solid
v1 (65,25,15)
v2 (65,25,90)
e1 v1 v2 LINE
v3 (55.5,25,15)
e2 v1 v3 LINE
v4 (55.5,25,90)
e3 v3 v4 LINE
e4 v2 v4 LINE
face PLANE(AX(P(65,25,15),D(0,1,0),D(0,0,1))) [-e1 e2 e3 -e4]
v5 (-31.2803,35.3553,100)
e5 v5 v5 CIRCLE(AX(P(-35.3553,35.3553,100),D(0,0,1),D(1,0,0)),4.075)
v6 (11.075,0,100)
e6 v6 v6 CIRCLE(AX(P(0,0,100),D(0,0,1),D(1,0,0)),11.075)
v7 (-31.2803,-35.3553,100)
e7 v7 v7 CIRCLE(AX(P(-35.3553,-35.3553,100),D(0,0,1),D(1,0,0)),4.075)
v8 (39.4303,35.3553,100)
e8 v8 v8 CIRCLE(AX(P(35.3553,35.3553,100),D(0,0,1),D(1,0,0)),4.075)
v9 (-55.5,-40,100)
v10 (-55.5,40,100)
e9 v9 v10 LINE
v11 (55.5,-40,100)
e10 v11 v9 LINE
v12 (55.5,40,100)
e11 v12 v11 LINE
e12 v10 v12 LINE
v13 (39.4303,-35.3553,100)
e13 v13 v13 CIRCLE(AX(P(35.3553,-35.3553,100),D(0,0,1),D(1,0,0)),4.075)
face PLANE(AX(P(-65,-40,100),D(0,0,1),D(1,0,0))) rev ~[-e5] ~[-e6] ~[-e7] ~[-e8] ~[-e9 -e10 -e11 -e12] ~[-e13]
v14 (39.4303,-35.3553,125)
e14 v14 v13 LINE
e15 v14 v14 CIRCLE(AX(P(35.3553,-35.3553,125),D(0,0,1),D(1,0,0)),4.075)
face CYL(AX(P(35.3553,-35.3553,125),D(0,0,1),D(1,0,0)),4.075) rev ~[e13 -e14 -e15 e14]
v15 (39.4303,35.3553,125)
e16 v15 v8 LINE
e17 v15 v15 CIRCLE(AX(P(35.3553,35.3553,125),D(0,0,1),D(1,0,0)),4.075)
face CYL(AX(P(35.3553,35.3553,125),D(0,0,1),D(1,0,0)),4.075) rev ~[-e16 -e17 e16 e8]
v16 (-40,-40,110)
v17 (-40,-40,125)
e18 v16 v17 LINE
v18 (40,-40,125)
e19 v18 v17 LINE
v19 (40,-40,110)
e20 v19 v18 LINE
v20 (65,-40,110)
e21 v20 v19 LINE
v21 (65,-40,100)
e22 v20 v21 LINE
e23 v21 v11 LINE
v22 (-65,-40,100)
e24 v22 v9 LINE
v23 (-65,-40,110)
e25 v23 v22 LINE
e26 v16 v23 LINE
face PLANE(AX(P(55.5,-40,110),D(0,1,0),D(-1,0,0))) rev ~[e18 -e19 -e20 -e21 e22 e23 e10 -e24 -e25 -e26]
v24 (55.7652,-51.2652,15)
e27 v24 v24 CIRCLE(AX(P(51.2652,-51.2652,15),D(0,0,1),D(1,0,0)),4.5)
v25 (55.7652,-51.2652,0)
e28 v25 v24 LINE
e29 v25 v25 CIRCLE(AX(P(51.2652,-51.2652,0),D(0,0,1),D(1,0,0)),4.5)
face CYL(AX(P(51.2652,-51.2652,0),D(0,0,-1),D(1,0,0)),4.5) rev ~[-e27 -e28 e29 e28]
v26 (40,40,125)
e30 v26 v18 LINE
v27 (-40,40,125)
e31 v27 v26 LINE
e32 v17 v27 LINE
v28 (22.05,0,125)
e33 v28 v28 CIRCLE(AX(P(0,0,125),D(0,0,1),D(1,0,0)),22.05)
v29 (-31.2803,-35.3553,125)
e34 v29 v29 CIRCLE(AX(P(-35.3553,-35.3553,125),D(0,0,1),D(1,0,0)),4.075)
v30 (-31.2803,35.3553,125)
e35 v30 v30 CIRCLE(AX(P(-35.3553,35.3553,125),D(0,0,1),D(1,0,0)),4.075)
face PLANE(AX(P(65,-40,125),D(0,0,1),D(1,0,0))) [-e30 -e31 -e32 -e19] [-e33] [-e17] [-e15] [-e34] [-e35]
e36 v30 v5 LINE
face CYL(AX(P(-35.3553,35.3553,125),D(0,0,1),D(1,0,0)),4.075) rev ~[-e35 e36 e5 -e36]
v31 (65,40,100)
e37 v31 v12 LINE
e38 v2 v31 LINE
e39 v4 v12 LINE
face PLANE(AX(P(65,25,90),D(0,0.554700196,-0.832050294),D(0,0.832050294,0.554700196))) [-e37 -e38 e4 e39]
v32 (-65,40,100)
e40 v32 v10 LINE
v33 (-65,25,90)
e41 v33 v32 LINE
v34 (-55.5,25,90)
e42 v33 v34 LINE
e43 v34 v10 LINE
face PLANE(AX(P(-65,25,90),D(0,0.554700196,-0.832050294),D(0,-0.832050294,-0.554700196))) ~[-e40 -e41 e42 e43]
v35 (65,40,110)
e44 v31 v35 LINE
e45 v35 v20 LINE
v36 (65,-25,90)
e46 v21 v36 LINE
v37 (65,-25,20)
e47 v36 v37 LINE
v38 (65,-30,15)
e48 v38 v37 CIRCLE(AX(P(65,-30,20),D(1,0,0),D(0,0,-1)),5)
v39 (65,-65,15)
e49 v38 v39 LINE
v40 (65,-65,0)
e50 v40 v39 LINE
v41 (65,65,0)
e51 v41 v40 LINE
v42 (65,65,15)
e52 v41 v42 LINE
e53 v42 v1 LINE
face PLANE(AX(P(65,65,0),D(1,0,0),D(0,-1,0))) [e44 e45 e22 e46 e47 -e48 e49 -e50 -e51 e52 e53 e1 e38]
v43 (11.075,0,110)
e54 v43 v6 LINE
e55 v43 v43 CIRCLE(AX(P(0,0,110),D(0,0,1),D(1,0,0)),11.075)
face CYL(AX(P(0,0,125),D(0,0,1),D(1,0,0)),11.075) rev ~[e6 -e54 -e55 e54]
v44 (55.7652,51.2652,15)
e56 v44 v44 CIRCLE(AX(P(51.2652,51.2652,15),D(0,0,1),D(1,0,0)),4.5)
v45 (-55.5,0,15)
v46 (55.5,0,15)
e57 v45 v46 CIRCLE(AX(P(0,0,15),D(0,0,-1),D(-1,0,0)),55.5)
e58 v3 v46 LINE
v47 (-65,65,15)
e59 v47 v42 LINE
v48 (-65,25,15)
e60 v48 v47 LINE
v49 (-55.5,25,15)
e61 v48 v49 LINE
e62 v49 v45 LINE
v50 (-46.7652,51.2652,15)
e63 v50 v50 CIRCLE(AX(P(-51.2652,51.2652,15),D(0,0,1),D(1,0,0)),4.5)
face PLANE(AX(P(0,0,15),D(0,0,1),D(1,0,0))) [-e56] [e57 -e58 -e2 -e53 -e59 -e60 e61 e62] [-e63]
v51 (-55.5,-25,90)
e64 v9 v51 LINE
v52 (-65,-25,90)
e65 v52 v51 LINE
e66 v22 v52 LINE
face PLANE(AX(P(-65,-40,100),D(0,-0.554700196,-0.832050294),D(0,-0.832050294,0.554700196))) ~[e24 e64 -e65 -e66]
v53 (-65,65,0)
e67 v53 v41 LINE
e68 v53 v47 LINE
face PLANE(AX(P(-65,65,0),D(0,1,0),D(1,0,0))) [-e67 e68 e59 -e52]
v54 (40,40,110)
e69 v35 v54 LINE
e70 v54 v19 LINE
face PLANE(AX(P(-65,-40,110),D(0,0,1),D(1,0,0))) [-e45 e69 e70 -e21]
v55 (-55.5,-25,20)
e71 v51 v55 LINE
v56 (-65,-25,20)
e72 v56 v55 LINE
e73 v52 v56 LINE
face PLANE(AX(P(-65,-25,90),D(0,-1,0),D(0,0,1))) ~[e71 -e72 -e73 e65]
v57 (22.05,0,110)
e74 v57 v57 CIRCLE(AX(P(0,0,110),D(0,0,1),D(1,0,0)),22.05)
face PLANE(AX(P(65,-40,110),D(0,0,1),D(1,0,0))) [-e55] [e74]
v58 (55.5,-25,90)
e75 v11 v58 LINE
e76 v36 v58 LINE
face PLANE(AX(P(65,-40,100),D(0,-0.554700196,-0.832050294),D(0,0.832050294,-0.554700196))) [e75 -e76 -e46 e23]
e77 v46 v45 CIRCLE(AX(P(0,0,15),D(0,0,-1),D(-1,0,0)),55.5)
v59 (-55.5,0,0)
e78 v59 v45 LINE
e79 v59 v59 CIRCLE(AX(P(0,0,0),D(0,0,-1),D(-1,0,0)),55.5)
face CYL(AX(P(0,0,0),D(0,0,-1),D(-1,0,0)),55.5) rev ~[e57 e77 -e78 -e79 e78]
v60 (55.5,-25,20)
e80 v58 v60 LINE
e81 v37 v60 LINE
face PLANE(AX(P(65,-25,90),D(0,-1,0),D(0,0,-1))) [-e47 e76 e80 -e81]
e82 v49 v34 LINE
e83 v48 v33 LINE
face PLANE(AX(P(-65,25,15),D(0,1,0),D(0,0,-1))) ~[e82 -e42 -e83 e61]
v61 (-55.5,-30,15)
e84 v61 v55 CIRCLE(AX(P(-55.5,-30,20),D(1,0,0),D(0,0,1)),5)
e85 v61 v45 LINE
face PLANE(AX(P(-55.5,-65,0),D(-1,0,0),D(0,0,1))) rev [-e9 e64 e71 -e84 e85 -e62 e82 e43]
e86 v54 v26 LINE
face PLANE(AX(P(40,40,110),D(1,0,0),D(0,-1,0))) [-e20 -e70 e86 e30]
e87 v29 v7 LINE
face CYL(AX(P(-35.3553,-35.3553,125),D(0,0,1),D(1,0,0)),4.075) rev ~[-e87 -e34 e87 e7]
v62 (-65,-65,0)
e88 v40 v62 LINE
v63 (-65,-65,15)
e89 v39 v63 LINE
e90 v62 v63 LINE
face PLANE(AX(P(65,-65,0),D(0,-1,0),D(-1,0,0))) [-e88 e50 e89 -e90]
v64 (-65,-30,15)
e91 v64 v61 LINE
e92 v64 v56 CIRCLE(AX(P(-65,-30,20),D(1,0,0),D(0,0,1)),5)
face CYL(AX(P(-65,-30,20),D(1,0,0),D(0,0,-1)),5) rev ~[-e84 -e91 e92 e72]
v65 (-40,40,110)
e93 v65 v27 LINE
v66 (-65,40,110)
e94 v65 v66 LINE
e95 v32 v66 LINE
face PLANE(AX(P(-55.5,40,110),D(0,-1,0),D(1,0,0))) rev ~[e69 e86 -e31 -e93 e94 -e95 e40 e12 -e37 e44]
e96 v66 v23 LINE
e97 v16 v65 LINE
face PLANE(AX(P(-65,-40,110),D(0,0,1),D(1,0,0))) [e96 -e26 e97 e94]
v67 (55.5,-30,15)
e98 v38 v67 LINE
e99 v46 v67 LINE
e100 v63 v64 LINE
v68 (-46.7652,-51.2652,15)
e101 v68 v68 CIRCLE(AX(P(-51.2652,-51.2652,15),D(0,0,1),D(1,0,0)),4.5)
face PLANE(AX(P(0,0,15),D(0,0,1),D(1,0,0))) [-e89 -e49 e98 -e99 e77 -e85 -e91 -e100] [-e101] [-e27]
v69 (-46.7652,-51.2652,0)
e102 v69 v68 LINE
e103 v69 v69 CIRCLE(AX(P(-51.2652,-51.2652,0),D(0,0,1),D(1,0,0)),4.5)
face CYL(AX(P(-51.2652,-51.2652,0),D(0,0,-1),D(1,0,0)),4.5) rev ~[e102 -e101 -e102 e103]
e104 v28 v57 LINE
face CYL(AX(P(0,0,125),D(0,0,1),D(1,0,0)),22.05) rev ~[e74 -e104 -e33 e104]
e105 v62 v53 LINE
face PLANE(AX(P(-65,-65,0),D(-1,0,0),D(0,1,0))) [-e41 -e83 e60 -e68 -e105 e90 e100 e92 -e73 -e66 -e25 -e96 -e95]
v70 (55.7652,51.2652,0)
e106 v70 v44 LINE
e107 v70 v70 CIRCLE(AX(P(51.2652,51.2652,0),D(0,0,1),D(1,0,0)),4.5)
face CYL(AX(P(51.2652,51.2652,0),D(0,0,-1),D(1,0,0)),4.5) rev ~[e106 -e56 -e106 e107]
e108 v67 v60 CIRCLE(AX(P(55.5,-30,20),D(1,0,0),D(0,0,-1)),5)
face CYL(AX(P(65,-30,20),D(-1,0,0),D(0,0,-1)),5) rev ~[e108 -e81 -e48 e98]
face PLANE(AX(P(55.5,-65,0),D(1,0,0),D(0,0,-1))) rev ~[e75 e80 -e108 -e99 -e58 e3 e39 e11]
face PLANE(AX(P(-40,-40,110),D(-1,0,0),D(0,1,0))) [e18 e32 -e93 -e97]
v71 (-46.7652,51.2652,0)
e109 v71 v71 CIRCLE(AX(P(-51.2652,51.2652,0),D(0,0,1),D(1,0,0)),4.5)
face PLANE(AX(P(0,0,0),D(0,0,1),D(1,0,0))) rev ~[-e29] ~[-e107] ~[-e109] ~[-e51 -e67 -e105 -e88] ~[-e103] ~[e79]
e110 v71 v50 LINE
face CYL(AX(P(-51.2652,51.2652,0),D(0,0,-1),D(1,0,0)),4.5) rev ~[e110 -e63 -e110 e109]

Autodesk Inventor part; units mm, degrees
ref_plane "YZ Plane" through (0, 0, 0) normal (1, 0, 0) x (0, 1, 0)
ref_plane "XZ Plane" through (0, 0, 0) normal (0, 1, 0) x (-1, 0, 0)
ref_plane "XY Plane" through (0, 0, 0) normal (0, 0, 1) x (1, 0, 0)
sketch "Sketch1" plane through (0, 0, 0) normal (0, 0, 1) x (1, 0, 0)
  line L0 (-65, 65) -> (65, 65)
  line L1 (65, 65) -> (65, -65)
  line L2 (65, -65) -> (-65, -65)
  line L3 (-65, -65) -> (-65, 65)
  line L4 (-65, 65) -> (65, -65) construction
  line L5 (65, 65) -> (-65, -65) construction
  circle A0 centre (0, 0) radius 72.5 construction
  circle A1 centre (51.2652, 51.2652) radius 4.5
  line L6 (0, 0) -> (0, 13.8436) construction
  line L7 (0, 0) -> (-14.1522, 0) construction
  circle A2 centre (-51.2652, 51.2652) radius 4.5
  circle A3 centre (51.2652, -51.2652) radius 4.5
  circle A4 centre (-51.2652, -51.2652) radius 4.5
  dimension "d66" = 145
  dimension "d0" = 130
  dimension "d1" = 130
  dimension "d67" = 9
extrude "Extrusion1" add sketch "Sketch1" along normal blind 15
sketch "Sketch2" plane through (65, -65, 0) normal (1, 0, 0) x (0, 0, -1)
  line L0 (0, 0) -> (0, 130) construction
  line L1 (-22.5, 65) -> (-82.5, 65) construction
  line L2 (-90, 40) -> (-15, 40)
  line L3 (-15, 90) -> (-15, 40)
  line L4 (-15, 0) -> (-15, 130) construction
  line L5 (-15, 90) -> (-15, 130) construction
  line L6 (-100, 105) -> (-110, 105)
  line L7 (-110, 105) -> (-110, 25)
  line L8 (-15, 90) -> (-90, 90)
  line L9 (-90, 90) -> (-100, 105)
  line L10 (-110, 25) -> (-100, 25)
  line L11 (-100, 25) -> (-90, 40)
  point P0 (0, 90)
  point P1 (0, 40)
  dimension "d98" = 10
  dimension "d101" = 110
  dimension "d102" = 75
  dimension "d103" = 75
  dimension "d104" = 10
extrude "Extrusion2" add sketch "Sketch2" against normal blind 9.5
mirror "Mirror1" about plane through (0, 0, 0) normal (1, 0, 0) of "Extrusion2"
sketch "Sketch6" plane through (0, 0, 0) normal (0, 0, -1) x (-1, 0, 0)
  circle A0 centre (0, 0) radius 55.5
  dimension "d37" = 111
extrude "Extrusion6" cut sketch "Sketch6" against normal up to surface (15 mm away)
fillet "Fillet1" radius 5 2 edges at (-60.25, -25, 15) (60.25, -25, 15)
sketch "Sketch14" plane through (-65, -40, 110) normal (0, 0, 1) x (1, 0, 0)
  line L0 (120.5, 15) -> (120.5, 0) projected
  line L1 (9.5, 80) -> (120.5, 80)
  line L2 (120.5, 80) -> (120.5, 0)
  line L3 (120.5, 0) -> (9.5, 0)
  line L4 (9.5, 0) -> (9.5, 80)
extrude "Extrusion14" add sketch "Sketch14" against normal blind 10
sketch "Sketch15" plane through (65, -40, 110) normal (0, 0, 1) x (1, 0, 0)
  line L0 (-25, 0) -> (-105, 0)
  line L1 (-105, 0) -> (-105, 80)
  line L2 (-105, 80) -> (-25, 80)
  line L3 (-25, 80) -> (-25, 0)
  line L4 (-25, 0) -> (-105, 80) construction
  line L5 (-105, 0) -> (-25, 80) construction
  point P0 (-65, 40)
  dimension "d105" = 80
  dimension "d106" = 80
extrude "Extrusion15" add sketch "Sketch15" along normal blind 15
sketch "Sketch16" plane through (65, -40, 125) normal (0, 0, 1) x (1, 0, 0)
  circle A0 centre (-65, 40) radius 50 construction
  line L0 (-65, 40) -> (-100.3553, 75.3553) construction
  line L1 (-65, 40) -> (-15, 40) construction
  line L2 (-65, 40) -> (-65, 52) construction
  circle A1 centre (-100.3553, 75.3553) radius 4.075
  circle A2 centre (-29.6447, 75.3553) radius 4.075
  circle A3 centre (-100.3553, 4.6447) radius 4.075
  circle A4 centre (-29.6447, 4.6447) radius 4.075
  circle A5 centre (-65, 40) radius 11.075
  dimension "d109" = 100
  dimension "d110" = 135
  dimension "d111" = 12
  dimension "d112" = 8.15
  dimension "d113" = 22.15
extrude "Extrusion16" cut sketch "Sketch16" against normal up to surface (25 mm away)
sketch "Sketch17" plane through (65, -40, 125) normal (0, 0, 1) x (1, 0, 0)
  circle A0 centre (-65, 40) radius 22.05
  circle A1 centre (-65, 40) radius 11.075 projected
  dimension "d116" = 44.1
extrude "Extrusion17" cut sketch "Sketch17" against normal blind 15
properties part number "MOTOR-BRACKET"
